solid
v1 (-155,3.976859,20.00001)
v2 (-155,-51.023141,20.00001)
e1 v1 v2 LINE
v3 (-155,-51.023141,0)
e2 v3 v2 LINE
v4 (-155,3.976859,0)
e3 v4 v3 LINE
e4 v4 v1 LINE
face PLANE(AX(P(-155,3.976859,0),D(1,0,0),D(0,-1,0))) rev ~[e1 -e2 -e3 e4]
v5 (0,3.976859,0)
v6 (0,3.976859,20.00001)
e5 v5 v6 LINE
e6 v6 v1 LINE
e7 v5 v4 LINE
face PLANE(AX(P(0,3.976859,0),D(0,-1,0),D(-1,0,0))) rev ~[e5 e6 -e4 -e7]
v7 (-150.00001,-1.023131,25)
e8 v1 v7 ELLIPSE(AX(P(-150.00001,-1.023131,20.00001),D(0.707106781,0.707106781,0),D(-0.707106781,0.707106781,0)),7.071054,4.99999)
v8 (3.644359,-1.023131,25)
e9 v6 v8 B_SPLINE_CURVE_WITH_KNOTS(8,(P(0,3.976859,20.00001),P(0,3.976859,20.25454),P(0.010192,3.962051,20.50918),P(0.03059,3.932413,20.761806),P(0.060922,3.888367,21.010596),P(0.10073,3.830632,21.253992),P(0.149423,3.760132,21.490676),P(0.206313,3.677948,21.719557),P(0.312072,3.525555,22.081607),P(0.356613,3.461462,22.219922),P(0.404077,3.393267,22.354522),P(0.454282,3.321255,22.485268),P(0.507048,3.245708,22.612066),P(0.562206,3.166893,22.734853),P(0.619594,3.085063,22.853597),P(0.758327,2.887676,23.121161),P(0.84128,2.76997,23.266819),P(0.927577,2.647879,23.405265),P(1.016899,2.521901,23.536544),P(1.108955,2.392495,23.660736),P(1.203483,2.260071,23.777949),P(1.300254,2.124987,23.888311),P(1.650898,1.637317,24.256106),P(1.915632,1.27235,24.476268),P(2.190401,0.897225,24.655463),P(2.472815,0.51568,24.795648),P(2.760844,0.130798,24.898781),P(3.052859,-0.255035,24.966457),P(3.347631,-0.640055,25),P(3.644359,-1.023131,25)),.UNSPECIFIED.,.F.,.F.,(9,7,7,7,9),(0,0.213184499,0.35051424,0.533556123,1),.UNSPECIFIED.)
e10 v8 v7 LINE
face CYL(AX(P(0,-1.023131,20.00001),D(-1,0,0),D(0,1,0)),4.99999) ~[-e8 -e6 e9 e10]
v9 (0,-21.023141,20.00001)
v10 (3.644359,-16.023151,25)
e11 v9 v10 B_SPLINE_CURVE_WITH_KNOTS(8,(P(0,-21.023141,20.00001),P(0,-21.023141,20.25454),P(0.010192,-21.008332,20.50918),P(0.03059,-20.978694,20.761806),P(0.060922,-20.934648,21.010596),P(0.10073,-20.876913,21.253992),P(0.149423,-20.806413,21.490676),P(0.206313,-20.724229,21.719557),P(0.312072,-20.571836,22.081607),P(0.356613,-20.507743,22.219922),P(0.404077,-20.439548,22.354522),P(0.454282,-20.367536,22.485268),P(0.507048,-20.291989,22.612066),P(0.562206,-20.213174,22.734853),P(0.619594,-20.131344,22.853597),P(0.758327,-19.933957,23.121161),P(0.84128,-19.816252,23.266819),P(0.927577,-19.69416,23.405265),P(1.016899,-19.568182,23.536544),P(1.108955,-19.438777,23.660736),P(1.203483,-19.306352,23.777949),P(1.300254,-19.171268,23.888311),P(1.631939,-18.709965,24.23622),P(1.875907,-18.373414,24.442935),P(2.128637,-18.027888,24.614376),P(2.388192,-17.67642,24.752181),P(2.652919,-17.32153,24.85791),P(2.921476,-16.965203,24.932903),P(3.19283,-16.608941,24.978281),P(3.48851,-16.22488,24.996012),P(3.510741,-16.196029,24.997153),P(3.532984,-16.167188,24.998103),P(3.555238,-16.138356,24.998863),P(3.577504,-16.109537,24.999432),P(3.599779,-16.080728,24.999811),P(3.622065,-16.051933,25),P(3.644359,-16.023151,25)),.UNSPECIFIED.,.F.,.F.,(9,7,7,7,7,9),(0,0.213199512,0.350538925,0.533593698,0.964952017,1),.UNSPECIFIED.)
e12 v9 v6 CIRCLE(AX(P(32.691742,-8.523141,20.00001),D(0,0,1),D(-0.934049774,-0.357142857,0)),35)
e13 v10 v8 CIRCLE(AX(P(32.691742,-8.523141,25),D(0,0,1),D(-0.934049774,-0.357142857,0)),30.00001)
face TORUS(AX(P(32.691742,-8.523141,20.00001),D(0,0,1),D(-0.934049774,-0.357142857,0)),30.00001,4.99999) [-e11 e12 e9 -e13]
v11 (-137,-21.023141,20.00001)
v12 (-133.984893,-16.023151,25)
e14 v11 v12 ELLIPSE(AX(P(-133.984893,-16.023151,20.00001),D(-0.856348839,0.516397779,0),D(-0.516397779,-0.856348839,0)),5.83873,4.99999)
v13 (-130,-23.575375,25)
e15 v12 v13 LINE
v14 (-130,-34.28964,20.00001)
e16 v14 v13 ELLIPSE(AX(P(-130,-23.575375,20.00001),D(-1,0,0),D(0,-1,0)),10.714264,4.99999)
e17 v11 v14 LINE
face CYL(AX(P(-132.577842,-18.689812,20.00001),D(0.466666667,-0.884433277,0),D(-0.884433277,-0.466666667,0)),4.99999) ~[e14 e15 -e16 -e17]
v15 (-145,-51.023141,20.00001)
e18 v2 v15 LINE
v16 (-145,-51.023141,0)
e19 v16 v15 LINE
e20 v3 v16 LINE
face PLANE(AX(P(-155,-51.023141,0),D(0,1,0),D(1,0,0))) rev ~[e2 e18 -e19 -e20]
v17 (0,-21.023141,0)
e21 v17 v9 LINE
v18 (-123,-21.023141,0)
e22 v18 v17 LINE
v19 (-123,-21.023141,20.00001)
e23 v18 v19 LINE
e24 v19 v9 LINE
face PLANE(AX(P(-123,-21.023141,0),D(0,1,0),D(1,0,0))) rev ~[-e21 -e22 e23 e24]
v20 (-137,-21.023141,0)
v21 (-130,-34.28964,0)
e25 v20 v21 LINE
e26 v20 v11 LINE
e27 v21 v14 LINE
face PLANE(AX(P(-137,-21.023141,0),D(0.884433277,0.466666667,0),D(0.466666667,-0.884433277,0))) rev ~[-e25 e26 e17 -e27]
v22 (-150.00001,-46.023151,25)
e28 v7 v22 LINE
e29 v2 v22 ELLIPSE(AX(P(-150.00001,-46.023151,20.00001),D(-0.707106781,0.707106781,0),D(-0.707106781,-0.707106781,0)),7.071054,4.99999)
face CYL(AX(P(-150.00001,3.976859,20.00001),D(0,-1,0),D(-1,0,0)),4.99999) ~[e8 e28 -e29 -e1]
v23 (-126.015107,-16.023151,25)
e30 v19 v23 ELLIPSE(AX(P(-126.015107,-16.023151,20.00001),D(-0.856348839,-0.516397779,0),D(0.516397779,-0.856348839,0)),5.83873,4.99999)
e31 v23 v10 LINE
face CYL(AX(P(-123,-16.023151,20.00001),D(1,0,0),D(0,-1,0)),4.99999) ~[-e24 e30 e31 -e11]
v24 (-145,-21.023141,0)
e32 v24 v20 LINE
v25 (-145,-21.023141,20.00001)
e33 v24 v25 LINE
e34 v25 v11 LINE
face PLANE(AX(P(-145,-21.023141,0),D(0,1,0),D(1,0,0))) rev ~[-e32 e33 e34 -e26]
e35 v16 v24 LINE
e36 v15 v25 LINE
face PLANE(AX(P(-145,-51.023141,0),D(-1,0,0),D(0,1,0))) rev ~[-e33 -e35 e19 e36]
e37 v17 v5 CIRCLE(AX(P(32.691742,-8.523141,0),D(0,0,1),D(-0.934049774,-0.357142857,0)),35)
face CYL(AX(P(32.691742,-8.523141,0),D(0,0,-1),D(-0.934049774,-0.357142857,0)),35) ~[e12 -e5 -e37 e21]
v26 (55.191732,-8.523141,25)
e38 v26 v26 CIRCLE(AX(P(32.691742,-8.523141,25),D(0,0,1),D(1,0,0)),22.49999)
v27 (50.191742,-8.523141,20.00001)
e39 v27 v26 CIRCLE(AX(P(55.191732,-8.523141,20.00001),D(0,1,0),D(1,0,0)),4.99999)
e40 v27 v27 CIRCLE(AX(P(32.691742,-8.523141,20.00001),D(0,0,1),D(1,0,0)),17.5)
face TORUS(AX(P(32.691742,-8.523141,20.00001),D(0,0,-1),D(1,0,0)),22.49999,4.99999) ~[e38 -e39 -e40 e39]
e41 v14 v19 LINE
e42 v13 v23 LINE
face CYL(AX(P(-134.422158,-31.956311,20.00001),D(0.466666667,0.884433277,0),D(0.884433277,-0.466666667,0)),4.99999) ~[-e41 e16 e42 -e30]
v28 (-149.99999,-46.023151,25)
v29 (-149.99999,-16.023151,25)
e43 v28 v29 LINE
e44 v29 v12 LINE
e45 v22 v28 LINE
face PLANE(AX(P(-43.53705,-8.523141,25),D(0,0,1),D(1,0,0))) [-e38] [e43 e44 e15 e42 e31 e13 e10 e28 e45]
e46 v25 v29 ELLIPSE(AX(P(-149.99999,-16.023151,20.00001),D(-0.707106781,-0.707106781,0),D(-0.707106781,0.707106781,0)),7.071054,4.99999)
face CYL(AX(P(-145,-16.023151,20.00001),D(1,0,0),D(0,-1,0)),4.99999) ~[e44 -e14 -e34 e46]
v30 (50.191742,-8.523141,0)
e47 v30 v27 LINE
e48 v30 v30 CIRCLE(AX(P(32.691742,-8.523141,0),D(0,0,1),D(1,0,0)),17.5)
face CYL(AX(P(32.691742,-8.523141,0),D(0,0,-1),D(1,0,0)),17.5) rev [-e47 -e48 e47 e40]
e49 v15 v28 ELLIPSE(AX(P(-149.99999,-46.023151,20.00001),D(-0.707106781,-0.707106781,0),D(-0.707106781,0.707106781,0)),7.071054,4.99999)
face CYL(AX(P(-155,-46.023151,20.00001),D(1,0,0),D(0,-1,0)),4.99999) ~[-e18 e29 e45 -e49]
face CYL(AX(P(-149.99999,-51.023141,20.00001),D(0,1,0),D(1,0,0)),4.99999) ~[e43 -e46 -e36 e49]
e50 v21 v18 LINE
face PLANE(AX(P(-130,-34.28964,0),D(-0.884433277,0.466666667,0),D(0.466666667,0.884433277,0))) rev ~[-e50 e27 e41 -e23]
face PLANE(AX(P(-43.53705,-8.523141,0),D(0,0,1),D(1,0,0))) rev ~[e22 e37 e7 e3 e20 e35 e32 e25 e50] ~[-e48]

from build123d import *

# Parameters (mm, degrees)
F0_R     = 17.5
F0_W     = 8
F0_H     = 15
F1_DEPTH = 25
F2_R     = 4.99999


# Not quite as in the source:
# - a fillet or chamfer is up to 0.001 mm smaller than in the source, because OpenCascade refuses the exact size


with BuildPart() as f1:
    # F0 (on Top) → F1 (new body)
    with BuildSketch(Plane.XY):
        with BuildLine():
            Line((0, 3.9768594503), (-155, 3.9768594503))
            Line((-155, 3.9768594503), (-155, -21.0231405497))
            Line((-155, -21.0231405497), (-147, -21.0231405497))
            Line((-147, -21.0231405497), (-145, -21.0231405497))
            Line((-145, -21.0231405497), (-137, -21.0231405497))
            Line((-137, -21.0231405497), (-123, -21.0231405497))
            Line((-123, -21.0231405497), (0, -21.0231405497))
            ThreePointArc((0, -21.0231405497), (67.6917420766, -8.5231405497), (0, 3.9768594503))
        make_face()
        with Locations((32.6917420766, -8.5231405497)):
            Circle(F0_R, mode=Mode.SUBTRACT)
        with Locations((-151, -28.5231405497)):
            Rectangle(F0_W, F0_H)
        Polygon((-145, -21.0231405497), (-147, -21.0231405497), (-147, -36.0231405497), (-155, -36.0231405497), (-155, -51.0231405497), (-145, -51.0231405497), align=None)
        Polygon((-130, -34.2896397111), (-123, -21.0231405497), (-137, -21.0231405497), align=None)
    extrude(amount=F1_DEPTH)

    # F2 (radius 5 in the source; OpenCascade refuses exactly that, so slightly less here)
    f2_edges = [f1.edges().sort_by_distance(p)[0] for p in [
        (-77.5, 3.976859, 25),
        (-61.5, -21.023141, 25),
        (-133.5, -27.65639, 25),
        (-155, -23.523141, 25),
        (-145, -36.023141, 25),
        (67.691742, -8.523141, 25),
        (-150, -51.023141, 25),
        (-141, -21.023141, 25),
        (-126.5, -27.65639, 25),
        (15.191742, -8.523141, 25),
    ]]
    fillet(f2_edges, radius=F2_R)


solid = f1.part
